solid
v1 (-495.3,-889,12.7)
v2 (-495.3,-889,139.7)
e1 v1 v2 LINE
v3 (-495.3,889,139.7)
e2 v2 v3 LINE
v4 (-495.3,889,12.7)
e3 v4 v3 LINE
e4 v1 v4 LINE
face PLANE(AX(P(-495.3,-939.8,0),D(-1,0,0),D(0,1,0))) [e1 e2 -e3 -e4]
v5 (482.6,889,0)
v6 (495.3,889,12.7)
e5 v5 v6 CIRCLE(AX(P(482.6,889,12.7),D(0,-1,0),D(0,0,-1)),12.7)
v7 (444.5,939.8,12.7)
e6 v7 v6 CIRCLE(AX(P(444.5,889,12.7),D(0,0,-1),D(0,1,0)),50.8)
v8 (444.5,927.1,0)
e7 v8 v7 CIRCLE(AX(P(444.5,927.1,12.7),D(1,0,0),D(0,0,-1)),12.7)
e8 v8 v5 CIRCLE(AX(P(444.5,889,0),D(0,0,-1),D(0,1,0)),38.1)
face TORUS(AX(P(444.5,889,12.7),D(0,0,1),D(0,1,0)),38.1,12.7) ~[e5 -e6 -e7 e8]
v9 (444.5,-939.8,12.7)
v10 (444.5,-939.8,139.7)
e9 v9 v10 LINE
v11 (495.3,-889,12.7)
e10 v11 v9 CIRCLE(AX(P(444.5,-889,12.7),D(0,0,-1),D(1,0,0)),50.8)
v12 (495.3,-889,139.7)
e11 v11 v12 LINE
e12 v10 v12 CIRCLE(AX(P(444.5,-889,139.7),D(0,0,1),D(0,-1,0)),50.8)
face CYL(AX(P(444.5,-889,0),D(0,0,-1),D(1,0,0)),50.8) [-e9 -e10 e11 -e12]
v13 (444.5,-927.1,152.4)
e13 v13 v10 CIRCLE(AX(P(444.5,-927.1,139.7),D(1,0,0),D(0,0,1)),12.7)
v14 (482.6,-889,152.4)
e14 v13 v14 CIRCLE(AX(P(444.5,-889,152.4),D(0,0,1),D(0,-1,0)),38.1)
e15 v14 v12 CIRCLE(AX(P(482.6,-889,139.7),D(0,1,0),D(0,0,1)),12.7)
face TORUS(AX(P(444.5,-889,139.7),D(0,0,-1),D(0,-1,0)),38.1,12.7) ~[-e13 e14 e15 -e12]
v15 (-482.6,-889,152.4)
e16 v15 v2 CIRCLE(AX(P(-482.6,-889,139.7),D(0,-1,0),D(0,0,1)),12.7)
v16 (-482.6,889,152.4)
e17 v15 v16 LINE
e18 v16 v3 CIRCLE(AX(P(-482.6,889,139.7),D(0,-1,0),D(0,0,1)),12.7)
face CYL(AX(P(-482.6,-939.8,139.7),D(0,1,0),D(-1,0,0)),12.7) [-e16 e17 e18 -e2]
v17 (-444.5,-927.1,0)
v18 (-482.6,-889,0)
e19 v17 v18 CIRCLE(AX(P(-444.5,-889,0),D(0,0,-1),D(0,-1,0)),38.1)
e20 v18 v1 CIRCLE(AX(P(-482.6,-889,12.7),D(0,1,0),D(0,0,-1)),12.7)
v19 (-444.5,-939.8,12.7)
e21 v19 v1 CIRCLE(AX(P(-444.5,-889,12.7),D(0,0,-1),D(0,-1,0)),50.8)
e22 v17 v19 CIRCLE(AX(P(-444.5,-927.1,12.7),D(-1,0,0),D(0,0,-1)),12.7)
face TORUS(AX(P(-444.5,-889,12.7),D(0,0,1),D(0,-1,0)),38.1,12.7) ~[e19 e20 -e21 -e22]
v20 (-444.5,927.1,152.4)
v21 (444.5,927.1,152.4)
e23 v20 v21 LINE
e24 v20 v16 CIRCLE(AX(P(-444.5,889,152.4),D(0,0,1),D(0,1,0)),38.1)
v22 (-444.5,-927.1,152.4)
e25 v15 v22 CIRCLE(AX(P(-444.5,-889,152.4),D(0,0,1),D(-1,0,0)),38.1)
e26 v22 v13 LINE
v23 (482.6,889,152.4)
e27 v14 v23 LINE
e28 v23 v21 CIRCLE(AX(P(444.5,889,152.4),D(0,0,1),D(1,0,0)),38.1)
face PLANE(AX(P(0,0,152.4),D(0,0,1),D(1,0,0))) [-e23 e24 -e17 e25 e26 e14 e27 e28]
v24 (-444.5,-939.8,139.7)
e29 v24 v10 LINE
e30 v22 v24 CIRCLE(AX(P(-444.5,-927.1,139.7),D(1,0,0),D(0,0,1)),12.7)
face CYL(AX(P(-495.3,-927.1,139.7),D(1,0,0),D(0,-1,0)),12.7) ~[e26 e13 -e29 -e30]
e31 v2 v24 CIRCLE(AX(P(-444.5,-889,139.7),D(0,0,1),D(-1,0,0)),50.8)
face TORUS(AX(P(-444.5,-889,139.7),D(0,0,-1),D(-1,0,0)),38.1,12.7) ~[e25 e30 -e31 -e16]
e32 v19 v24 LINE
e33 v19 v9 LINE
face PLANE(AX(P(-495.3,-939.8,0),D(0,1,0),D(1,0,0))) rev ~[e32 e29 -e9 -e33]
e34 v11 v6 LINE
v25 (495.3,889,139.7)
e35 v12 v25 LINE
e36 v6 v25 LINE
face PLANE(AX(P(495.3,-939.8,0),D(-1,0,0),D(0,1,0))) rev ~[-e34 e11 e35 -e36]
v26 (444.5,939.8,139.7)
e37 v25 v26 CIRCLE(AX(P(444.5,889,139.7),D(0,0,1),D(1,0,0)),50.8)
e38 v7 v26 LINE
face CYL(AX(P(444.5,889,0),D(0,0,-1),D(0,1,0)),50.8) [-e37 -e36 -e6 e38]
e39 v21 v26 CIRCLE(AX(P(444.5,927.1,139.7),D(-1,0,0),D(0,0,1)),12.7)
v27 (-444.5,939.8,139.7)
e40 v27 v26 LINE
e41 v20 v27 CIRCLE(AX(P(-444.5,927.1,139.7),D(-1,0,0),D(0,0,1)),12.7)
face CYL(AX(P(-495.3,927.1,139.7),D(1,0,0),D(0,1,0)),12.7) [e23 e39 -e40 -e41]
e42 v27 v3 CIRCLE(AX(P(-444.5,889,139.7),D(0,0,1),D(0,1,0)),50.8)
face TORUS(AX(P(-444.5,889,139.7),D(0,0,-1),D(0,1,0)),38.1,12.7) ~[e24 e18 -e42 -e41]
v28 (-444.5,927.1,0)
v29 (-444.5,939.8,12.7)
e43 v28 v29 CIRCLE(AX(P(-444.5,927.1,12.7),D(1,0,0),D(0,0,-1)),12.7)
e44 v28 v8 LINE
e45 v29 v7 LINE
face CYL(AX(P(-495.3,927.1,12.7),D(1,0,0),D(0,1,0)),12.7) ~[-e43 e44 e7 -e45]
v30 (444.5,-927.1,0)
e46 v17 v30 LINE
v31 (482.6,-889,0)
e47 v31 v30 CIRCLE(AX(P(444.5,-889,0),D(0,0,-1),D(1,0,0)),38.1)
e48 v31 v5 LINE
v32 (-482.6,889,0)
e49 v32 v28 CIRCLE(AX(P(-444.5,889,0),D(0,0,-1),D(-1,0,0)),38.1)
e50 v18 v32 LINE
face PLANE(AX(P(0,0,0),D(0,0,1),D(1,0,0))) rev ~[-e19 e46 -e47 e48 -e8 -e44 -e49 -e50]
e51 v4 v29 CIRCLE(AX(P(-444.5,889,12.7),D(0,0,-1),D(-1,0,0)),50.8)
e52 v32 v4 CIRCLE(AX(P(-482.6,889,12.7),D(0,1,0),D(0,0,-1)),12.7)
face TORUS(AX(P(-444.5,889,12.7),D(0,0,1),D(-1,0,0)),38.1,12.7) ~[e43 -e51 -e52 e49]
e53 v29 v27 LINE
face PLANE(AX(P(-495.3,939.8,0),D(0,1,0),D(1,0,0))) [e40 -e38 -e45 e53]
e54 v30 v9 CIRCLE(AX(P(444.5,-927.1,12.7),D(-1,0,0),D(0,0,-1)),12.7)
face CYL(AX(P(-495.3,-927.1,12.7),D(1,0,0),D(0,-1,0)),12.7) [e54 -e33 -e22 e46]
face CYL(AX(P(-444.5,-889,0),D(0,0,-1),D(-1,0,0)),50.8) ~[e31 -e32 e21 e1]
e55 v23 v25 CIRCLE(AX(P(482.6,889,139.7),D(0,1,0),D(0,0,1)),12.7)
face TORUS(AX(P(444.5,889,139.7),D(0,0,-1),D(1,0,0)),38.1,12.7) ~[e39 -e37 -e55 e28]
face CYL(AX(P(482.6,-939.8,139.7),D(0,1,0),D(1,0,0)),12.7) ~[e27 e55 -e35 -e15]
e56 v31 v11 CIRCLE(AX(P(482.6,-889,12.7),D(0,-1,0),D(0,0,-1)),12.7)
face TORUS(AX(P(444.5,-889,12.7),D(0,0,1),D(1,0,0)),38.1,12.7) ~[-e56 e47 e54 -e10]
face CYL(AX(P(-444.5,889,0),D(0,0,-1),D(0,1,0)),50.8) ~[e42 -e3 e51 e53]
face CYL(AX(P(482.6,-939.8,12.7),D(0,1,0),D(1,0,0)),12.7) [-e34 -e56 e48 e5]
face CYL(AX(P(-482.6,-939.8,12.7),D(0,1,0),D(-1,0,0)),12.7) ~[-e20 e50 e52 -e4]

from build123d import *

# Parameters (mm, degrees)
F0_W         = 990.6
F0_H         = 1879.6
F1_DEPTH     = 152.4
F2_R         = 12.7
F3_T1_DEPTH  = 152.4
F3_T4_ANGLE  = 90
F3_T6_ANGLE  = 90
F3_T8_ANGLE  = 90
F3_T10_ANGLE = 90
F3_T12_ANGLE = 90
F3_T14_ANGLE = 90
F3_T16_ANGLE = 90
F3_T18_ANGLE = 90


# Not quite as in the source:
# - a fillet or chamfer that OpenCascade refuses, or shapes differently, is made with other operations: its cross-section is extruded or revolved along the edge and cut away or added


with BuildPart() as f1:
    # F0 (on Top) → F1 (new body)
    with BuildSketch(Plane.XY):
        Rectangle(F0_W, F0_H)
    extrude(amount=F1_DEPTH)

    # F2
    f2_edges = [f1.edges().sort_by_distance(p)[0] for p in [
        (-495.3, 0, 152.4),
        (0, -939.8, 152.4),
        (495.3, 0, 152.4),
        (0, 939.8, 152.4),
        (495.3, 0, 0),
        (0, -939.8, 0),
        (-495.3, 0, 0),
        (0, 939.8, 0),
    ]]
    fillet(f2_edges, radius=F2_R)

    # F3: fillet of radius 50.8 on 4 edges, made by hand

    # F3_s2 → F3_t1 (cut)
    with BuildSketch(Plane.XY):
        with BuildLine():
            ThreePointArc((-495.3, -889), (-480.4210244843, -924.9210244843), (-444.5, -939.8))
            Line((-444.5, -939.8), (-444.5, -940.816))
            Line((-444.5, -940.816), (-496.316, -940.816))
            Line((-496.316, -940.816), (-496.316, -889))
            Line((-496.316, -889), (-495.3, -889))
        make_face()
        with BuildLine():
            ThreePointArc((495.3, -889), (480.4210244843, -924.9210244843), (444.5, -939.8))
            Line((444.5, -939.8), (444.5, -940.816))
            Line((444.5, -940.816), (496.316, -940.816))
            Line((496.316, -940.816), (496.316, -889))
            Line((496.316, -889), (495.3, -889))
        make_face()
        with BuildLine():
            ThreePointArc((444.5, 939.8), (480.4210244843, 924.9210244843), (495.3, 889))
            Line((495.3, 889), (496.316, 889))
            Line((496.316, 889), (496.316, 940.816))
            Line((496.316, 940.816), (444.5, 940.816))
            Line((444.5, 940.816), (444.5, 939.8))
        make_face()
        with BuildLine():
            ThreePointArc((-444.5, 939.8), (-480.4210244843, 924.9210244843), (-495.3, 889))
            Line((-495.3, 889), (-496.316, 889))
            Line((-496.316, 889), (-496.316, 940.816))
            Line((-496.316, 940.816), (-444.5, 940.816))
            Line((-444.5, 940.816), (-444.5, 939.8))
        make_face()
    extrude(amount=F3_T1_DEPTH, mode=Mode.SUBTRACT)

    # F3_s3 → F3_t4 (revolve, cut)
    with BuildSketch(Plane.XZ.offset(-889)):
        with BuildLine():
            ThreePointArc((-482.6, 0), (-491.5802561211, 3.7197438789), (-495.3, 12.7))
            Line((-495.3, 12.7), (-495.3, 0))
            Line((-495.3, 0), (-482.6, 0))
        make_face()
    revolve(axis=Axis((-444.5, 889, 0), (0, 0, -1)), revolution_arc=F3_T4_ANGLE, mode=Mode.SUBTRACT)

    # F3_s5 → F3_t6 (revolve, cut)
    with BuildSketch(Plane.YZ.offset(-444.5)):
        with BuildLine():
            ThreePointArc((927.1, 152.4), (936.0802561211, 148.6802561211), (939.8, 139.7))
            Line((939.8, 139.7), (939.8, 152.4))
            Line((939.8, 152.4), (927.1, 152.4))
        make_face()
    revolve(axis=Axis((-444.5, 889, 152.4), (0, 0, 1)), revolution_arc=F3_T6_ANGLE, mode=Mode.SUBTRACT)

    # F3_s7 → F3_t8 (revolve, cut)
    with BuildSketch(Plane.YZ.offset(444.5)):
        with BuildLine():
            ThreePointArc((927.1, 0), (936.0802561211, 3.7197438789), (939.8, 12.7))
            Line((939.8, 12.7), (939.8, 0))
            Line((939.8, 0), (927.1, 0))
        make_face()
    revolve(axis=Axis((444.5, 889, 0), (0, 0, -1)), revolution_arc=F3_T8_ANGLE, mode=Mode.SUBTRACT)

    # F3_s9 → F3_t10 (revolve, cut)
    with BuildSketch(Plane.XZ.offset(-889)):
        with BuildLine():
            ThreePointArc((482.6, 152.4), (491.5802561211, 148.6802561211), (495.3, 139.7))
            Line((495.3, 139.7), (495.3, 152.4))
            Line((495.3, 152.4), (482.6, 152.4))
        make_face()
    revolve(axis=Axis((444.5, 889, 152.4), (0, 0, 1)), revolution_arc=F3_T10_ANGLE, mode=Mode.SUBTRACT)

    # F3_s11 → F3_t12 (revolve, cut)
    with BuildSketch(Plane.XZ.offset(889)):
        with BuildLine():
            ThreePointArc((482.6, 0), (491.5802561211, 3.7197438789), (495.3, 12.7))
            Line((495.3, 12.7), (495.3, 0))
            Line((495.3, 0), (482.6, 0))
        make_face()
    revolve(axis=Axis((444.5, -889, 0), (0, 0, -1)), revolution_arc=F3_T12_ANGLE, mode=Mode.SUBTRACT)

    # F3_s13 → F3_t14 (revolve, cut)
    with BuildSketch(Plane.YZ.offset(444.5)):
        with BuildLine():
            ThreePointArc((-927.1, 152.4), (-936.0802561211, 148.6802561211), (-939.8, 139.7))
            Line((-939.8, 139.7), (-939.8, 152.4))
            Line((-939.8, 152.4), (-927.1, 152.4))
        make_face()
    revolve(axis=Axis((444.5, -889, 152.4), (0, 0, 1)), revolution_arc=F3_T14_ANGLE, mode=Mode.SUBTRACT)

    # F3_s15 → F3_t16 (revolve, cut)
    with BuildSketch(Plane.YZ.offset(-444.5)):
        with BuildLine():
            ThreePointArc((-927.1, 0), (-936.0802561211, 3.7197438789), (-939.8, 12.7))
            Line((-939.8, 12.7), (-939.8, 0))
            Line((-939.8, 0), (-927.1, 0))
        make_face()
    revolve(axis=Axis((-444.5, -889, 0), (0, 0, -1)), revolution_arc=F3_T16_ANGLE, mode=Mode.SUBTRACT)

    # F3_s17 → F3_t18 (revolve, cut)
    with BuildSketch(Plane.XZ.offset(889)):
        with BuildLine():
            ThreePointArc((-482.6, 152.4), (-491.5802561211, 148.6802561211), (-495.3, 139.7))
            Line((-495.3, 139.7), (-495.3, 152.4))
            Line((-495.3, 152.4), (-482.6, 152.4))
        make_face()
    revolve(axis=Axis((-444.5, -889, 152.4), (0, 0, 1)), revolution_arc=F3_T18_ANGLE, mode=Mode.SUBTRACT)


solid = f1.part
